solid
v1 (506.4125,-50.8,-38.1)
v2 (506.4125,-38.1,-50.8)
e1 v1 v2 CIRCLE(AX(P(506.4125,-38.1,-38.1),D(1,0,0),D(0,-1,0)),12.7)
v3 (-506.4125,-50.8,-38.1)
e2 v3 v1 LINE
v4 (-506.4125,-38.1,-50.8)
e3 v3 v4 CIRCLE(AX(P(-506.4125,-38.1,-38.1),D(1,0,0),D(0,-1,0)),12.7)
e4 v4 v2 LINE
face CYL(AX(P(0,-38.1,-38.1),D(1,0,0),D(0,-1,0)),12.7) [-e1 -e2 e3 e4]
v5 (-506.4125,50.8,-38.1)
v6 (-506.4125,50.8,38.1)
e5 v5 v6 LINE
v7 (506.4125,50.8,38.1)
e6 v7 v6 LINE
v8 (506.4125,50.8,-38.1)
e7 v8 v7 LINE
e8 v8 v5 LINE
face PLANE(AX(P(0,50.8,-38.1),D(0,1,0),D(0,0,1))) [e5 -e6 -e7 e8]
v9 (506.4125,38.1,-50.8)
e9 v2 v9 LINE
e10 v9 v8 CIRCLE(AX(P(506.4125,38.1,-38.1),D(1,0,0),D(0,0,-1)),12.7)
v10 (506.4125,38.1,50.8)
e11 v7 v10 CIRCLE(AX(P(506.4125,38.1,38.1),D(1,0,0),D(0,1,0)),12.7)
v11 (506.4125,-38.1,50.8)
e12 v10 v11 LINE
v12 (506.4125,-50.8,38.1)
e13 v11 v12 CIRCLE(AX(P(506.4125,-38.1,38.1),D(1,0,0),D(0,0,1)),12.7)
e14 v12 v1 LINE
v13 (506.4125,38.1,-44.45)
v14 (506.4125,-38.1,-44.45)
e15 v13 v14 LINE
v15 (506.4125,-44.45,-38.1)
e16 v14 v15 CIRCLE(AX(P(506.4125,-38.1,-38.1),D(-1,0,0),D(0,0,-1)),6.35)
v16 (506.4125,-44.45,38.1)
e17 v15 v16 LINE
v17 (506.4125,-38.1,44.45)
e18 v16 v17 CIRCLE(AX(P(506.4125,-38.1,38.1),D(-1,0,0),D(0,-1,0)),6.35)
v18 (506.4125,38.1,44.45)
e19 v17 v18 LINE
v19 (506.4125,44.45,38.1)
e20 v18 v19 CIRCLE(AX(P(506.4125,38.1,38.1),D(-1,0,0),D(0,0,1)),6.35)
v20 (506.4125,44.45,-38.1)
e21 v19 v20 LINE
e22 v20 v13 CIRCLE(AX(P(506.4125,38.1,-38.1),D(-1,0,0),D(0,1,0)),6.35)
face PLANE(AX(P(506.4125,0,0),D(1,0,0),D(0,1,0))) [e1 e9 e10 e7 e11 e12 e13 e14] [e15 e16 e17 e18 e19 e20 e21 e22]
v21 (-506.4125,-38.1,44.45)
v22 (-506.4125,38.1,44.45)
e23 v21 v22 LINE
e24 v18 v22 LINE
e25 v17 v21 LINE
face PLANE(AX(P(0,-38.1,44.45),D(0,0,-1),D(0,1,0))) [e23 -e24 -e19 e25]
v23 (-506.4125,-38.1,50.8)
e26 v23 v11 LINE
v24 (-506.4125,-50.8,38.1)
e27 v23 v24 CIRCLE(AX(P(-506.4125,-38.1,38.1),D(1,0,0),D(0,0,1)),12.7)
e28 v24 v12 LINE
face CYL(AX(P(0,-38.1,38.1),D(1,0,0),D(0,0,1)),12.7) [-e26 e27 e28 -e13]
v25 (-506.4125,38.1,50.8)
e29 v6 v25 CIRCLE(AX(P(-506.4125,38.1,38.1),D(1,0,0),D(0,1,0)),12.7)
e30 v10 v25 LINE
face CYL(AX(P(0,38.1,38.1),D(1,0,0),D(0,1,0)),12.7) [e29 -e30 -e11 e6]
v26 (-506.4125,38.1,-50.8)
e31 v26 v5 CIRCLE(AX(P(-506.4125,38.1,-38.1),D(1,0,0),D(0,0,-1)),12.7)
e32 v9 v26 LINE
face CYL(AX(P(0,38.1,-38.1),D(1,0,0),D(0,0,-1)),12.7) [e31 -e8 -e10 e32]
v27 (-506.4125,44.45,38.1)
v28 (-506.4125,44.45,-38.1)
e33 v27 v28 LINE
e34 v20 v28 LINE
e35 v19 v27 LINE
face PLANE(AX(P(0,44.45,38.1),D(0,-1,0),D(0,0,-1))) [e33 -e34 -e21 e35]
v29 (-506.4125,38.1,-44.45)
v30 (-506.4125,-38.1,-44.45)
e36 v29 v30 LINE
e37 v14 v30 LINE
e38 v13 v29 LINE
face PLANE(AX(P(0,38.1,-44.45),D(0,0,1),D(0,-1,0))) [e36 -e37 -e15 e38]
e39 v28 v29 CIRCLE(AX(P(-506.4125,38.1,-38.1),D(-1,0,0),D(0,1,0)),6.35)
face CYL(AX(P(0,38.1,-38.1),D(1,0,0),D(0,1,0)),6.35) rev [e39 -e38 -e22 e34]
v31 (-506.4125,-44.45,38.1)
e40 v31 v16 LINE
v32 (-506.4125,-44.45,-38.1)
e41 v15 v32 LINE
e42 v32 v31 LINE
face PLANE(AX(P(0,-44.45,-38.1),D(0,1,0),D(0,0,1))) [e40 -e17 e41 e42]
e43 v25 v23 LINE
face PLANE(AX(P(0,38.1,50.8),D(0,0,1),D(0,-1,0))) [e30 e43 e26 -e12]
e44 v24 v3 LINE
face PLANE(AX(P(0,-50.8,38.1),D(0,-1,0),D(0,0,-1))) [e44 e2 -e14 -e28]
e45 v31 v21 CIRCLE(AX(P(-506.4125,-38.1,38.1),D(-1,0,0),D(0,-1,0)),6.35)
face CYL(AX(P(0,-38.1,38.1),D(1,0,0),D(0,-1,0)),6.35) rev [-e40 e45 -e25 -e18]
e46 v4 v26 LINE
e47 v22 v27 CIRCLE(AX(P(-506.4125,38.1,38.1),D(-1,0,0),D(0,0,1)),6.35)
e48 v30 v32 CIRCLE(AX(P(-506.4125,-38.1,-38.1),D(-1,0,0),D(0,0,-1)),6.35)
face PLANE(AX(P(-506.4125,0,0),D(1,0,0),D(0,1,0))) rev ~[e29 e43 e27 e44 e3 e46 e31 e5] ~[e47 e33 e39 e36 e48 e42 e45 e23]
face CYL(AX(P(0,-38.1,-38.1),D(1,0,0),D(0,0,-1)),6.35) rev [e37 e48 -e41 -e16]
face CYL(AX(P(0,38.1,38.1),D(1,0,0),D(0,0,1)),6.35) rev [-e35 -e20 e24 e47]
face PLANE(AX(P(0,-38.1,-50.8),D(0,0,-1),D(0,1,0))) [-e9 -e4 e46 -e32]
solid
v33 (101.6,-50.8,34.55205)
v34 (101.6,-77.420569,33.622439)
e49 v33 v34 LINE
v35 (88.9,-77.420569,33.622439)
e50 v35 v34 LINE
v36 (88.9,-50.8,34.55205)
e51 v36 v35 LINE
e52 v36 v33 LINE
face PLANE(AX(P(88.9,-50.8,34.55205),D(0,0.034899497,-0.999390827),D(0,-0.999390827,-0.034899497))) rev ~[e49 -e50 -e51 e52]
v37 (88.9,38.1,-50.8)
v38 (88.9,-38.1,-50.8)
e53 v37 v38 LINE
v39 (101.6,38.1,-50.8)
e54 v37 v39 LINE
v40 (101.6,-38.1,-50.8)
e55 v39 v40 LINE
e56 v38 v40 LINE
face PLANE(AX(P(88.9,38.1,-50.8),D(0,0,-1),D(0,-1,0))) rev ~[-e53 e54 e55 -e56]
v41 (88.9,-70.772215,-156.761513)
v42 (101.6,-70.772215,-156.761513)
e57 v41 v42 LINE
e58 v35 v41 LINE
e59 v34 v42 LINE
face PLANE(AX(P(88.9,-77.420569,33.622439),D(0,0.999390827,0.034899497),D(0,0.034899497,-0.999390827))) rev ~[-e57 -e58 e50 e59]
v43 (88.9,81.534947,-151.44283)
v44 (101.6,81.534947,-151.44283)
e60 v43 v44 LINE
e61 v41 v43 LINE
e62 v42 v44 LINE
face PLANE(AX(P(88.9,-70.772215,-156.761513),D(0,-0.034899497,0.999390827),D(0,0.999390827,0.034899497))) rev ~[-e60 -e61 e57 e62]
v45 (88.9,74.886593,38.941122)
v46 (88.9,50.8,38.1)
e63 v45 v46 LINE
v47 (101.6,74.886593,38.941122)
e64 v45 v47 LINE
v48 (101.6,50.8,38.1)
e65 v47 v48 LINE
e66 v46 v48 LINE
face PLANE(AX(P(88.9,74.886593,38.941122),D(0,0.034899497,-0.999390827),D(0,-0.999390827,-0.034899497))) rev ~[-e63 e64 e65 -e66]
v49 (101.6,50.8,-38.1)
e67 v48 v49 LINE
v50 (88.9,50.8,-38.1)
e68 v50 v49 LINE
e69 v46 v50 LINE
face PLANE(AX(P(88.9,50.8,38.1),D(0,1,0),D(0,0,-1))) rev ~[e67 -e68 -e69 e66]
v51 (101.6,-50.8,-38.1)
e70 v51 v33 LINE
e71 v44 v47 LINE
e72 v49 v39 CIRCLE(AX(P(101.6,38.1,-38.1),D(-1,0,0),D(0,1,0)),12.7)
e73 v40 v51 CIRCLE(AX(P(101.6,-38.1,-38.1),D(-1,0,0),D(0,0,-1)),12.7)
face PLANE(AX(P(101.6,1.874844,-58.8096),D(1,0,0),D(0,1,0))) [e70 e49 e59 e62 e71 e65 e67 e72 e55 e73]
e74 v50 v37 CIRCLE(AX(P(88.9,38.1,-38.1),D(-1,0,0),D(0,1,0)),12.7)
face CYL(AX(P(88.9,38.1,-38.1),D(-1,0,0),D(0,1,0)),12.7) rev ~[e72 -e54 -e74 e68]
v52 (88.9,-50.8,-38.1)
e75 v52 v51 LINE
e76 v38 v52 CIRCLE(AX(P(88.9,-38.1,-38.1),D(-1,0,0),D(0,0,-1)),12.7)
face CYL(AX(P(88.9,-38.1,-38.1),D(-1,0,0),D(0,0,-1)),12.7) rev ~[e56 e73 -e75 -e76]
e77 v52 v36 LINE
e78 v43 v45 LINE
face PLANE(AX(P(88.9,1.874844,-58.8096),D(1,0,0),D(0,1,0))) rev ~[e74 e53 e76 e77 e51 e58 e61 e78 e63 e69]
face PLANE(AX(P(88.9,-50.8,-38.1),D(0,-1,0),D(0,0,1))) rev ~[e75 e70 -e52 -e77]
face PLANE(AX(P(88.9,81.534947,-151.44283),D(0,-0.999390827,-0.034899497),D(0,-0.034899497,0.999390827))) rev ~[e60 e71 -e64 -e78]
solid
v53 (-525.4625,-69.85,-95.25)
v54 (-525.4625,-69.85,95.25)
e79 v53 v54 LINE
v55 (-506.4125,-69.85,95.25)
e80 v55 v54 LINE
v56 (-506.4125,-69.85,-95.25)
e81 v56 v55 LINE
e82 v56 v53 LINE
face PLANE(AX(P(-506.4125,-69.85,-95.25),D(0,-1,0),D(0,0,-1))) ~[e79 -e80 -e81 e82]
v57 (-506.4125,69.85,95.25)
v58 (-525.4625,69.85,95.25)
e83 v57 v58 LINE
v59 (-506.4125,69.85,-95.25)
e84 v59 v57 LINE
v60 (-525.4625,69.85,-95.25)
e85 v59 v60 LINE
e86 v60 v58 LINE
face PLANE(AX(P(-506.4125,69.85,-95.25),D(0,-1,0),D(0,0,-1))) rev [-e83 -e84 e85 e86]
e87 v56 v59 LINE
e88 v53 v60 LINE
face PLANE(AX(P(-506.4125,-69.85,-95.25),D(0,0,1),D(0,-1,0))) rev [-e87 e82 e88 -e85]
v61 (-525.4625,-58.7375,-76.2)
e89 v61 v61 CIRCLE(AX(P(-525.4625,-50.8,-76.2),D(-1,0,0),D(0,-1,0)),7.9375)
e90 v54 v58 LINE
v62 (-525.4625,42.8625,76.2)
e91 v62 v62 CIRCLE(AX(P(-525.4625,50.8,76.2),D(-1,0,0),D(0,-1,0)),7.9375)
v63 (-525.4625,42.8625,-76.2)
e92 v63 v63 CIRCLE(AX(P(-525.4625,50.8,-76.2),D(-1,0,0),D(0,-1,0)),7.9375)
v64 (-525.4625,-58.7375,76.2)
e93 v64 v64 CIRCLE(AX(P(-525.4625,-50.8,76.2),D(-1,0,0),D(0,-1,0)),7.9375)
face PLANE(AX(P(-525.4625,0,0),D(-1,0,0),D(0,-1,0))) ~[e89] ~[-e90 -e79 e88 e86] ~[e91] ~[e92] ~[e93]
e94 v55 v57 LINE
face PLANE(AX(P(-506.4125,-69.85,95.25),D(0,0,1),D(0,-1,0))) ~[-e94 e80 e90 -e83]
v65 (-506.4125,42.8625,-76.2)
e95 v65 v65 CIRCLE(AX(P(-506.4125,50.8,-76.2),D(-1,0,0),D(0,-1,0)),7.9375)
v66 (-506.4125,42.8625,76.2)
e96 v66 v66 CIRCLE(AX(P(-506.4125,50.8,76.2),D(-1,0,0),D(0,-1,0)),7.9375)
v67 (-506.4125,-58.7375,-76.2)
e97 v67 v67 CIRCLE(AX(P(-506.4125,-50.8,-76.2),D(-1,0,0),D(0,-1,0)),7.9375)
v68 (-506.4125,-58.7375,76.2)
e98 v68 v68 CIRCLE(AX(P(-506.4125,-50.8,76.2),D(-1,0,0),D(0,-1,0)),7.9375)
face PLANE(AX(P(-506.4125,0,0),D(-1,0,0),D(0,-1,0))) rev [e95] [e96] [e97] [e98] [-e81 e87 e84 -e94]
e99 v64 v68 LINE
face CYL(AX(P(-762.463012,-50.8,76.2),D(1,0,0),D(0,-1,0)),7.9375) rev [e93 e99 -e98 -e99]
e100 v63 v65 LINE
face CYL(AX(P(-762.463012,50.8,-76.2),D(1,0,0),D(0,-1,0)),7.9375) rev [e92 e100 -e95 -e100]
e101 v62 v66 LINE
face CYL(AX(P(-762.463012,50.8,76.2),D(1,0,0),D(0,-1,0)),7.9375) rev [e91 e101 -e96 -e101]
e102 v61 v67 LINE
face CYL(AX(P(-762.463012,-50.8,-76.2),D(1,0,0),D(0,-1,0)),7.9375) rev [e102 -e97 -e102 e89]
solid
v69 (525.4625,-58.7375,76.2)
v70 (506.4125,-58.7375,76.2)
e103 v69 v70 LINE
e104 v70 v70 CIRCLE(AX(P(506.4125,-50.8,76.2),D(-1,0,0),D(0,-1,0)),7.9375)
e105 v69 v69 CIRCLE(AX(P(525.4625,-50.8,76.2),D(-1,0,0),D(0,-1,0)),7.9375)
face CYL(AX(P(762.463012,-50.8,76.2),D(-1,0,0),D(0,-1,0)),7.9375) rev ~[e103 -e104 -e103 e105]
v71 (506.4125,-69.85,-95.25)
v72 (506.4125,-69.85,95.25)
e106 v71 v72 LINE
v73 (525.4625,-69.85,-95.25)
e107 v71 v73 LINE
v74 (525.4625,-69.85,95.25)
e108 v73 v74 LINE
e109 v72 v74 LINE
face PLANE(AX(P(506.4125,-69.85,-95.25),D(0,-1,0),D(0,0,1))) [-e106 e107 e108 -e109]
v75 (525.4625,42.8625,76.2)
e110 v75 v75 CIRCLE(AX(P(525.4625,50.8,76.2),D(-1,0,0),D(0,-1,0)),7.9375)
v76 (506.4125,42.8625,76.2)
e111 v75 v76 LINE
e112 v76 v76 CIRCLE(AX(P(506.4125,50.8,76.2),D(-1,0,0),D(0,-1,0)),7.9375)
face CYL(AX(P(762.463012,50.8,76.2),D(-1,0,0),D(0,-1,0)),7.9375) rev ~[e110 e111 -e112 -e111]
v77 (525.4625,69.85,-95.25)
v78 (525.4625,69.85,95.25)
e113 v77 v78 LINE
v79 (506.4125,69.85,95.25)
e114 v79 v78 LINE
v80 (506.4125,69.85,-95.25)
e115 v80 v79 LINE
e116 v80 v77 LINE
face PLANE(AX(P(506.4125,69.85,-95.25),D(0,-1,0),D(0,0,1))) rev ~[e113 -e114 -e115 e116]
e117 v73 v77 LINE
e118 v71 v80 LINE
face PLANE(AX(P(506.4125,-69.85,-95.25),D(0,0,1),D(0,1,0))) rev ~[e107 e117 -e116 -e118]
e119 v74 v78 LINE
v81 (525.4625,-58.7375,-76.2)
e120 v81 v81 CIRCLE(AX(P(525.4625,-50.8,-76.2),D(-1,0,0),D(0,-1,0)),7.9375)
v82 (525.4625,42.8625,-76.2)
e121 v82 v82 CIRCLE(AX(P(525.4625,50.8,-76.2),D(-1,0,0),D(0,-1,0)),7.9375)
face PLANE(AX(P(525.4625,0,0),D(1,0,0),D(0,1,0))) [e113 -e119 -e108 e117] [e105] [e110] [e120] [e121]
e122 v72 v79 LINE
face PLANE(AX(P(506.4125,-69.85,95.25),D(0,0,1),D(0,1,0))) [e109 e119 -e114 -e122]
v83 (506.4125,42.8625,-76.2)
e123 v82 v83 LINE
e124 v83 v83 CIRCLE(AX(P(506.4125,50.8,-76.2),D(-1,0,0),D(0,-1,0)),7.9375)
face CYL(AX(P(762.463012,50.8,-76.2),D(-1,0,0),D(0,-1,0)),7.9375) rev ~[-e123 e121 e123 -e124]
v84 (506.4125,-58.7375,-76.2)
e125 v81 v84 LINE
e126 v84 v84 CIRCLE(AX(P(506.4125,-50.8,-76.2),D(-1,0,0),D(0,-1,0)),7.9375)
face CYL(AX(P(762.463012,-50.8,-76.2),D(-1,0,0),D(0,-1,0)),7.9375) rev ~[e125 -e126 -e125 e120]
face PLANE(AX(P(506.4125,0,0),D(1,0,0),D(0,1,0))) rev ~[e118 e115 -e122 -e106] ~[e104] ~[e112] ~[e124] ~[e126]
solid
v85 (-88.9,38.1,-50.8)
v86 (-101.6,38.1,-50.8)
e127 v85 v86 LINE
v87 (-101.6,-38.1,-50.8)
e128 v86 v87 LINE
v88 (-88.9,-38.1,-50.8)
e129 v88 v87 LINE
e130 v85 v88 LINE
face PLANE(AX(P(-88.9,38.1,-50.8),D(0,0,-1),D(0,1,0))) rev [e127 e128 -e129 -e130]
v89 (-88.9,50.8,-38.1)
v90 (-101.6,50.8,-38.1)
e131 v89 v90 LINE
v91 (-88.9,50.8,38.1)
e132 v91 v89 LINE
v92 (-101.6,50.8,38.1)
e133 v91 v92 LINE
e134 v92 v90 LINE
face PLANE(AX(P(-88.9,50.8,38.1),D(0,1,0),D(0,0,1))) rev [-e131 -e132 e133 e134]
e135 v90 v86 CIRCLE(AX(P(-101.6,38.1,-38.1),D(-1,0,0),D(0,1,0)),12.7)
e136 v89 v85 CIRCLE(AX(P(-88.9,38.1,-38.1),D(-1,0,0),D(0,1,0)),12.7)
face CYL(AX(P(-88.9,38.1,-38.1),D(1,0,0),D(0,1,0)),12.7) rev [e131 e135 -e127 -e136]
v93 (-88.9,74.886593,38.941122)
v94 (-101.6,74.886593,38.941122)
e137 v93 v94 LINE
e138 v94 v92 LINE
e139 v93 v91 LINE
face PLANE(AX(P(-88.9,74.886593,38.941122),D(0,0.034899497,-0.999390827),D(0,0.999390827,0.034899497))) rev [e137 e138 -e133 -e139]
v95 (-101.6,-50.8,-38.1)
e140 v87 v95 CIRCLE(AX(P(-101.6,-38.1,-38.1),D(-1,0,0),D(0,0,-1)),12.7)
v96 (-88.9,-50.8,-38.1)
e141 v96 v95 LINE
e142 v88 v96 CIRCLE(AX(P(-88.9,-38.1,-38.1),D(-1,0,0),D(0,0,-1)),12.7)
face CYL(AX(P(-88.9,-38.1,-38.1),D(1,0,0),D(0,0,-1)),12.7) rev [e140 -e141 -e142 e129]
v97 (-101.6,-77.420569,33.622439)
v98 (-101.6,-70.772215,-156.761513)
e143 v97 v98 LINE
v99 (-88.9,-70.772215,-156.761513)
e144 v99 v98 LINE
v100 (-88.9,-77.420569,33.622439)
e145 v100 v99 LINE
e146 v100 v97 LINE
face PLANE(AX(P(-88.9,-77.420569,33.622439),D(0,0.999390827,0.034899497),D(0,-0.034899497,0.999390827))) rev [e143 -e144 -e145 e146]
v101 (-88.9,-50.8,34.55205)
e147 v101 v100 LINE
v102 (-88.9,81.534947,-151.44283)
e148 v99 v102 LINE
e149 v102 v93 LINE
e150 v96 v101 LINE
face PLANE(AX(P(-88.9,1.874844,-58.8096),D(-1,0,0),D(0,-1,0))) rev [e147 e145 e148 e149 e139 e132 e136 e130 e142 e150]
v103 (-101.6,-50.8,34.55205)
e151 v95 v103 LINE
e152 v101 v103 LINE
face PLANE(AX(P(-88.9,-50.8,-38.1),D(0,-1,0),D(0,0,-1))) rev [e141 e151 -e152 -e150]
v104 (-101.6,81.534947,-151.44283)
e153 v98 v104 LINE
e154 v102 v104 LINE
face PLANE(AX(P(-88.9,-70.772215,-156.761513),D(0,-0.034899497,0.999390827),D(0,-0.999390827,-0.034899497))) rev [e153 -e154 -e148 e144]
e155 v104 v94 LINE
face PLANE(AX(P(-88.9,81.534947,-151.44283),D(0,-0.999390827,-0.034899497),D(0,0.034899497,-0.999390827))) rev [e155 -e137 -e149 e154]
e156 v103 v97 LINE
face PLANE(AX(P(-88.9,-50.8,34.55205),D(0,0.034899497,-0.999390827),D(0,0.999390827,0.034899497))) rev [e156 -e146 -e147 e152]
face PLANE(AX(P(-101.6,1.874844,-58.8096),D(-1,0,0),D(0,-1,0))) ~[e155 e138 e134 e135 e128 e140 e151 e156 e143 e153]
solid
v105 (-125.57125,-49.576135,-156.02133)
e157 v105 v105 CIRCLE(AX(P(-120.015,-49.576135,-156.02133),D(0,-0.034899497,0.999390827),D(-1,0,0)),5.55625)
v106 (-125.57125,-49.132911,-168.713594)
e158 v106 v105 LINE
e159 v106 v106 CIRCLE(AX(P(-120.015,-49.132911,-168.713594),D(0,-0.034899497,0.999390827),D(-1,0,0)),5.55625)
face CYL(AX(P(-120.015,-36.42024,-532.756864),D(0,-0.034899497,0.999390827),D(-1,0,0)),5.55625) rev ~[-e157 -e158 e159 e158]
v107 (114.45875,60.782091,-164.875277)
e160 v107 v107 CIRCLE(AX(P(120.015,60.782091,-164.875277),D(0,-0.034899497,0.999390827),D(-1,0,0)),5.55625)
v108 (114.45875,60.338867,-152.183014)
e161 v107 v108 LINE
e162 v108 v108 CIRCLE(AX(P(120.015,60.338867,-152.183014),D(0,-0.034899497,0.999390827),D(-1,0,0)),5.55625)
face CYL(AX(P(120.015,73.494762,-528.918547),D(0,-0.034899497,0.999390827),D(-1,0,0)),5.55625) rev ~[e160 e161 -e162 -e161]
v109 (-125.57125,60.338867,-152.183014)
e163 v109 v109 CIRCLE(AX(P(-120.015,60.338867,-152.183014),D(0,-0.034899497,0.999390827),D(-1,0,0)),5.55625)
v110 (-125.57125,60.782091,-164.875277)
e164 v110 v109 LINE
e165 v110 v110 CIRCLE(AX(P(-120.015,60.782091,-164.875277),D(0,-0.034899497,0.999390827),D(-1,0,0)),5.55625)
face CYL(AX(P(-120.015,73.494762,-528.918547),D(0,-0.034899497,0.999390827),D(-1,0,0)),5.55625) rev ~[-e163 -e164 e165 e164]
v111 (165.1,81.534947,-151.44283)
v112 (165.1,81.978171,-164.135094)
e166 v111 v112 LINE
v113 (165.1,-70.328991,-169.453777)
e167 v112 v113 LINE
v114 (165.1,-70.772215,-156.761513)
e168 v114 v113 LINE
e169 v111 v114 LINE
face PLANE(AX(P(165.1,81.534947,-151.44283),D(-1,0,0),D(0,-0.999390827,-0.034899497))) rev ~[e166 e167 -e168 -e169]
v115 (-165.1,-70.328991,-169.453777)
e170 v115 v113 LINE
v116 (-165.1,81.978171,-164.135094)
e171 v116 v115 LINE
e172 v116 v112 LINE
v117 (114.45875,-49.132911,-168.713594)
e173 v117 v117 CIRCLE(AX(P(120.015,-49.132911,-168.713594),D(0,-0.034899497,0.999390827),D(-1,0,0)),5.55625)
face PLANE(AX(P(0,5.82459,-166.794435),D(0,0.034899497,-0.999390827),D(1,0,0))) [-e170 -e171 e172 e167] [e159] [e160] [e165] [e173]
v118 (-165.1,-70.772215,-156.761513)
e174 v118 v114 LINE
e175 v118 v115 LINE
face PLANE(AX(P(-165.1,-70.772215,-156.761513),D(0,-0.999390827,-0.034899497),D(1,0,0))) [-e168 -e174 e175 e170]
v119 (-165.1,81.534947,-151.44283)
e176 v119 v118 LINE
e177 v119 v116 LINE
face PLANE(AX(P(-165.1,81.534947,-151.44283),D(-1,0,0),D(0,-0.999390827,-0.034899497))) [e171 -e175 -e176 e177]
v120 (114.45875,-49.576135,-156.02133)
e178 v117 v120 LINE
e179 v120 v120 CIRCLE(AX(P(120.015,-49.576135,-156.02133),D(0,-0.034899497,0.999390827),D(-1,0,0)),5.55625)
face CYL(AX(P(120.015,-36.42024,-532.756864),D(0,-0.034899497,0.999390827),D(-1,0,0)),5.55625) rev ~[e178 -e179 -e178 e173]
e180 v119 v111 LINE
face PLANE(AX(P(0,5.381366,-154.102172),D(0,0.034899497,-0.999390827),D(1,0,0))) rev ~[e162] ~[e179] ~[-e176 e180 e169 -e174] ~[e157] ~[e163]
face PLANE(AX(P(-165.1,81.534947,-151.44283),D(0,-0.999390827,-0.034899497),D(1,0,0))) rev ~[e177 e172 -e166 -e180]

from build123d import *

# Parameters (mm, degrees)
F1_DEPTH  = 506.4125
F2_W      = 139.7
F2_H      = 190.5
F3_DEPTH  = 19.05
F5_D      = 15.875
F9_DEPTH  = 12.7
F11_W     = 330.2
F11_H     = 152.4
F12_DEPTH = 12.7
F14_D     = 11.1125


# Not quite as in the source:
# - a length typed as a fraction of an inch, garbled in the dataset ("3 / 203.2 mm" for 3/8 in), is restored


with BuildPart() as f1:
    # F0 (on Right) → F1 (new body, symmetric)
    with BuildSketch(Plane.YZ):
        with BuildLine():
            Line((38.1, 50.8), (-38.1, 50.8))
            ThreePointArc((-38.1, 50.8), (-47.0802561211, 47.0802561211), (-50.8, 38.1))
            Line((-50.8, 38.1), (-50.8, -38.1))
            ThreePointArc((-50.8, -38.1), (-47.0802561211, -47.0802561211), (-38.1, -50.8))
            Line((-38.1, -50.8), (38.1, -50.8))
            ThreePointArc((38.1, -50.8), (47.0802561211, -47.0802561211), (50.8, -38.1))
            Line((50.8, -38.1), (50.8, 38.1))
            ThreePointArc((50.8, 38.1), (47.0802561211, 47.0802561211), (38.1, 50.8))
        make_face()
        with BuildLine():
            ThreePointArc((-44.45, 38.1), (-42.5901280605, 42.5901280605), (-38.1, 44.45))
            Line((-38.1, 44.45), (38.1, 44.45))
            ThreePointArc((38.1, 44.45), (42.5901280605, 42.5901280605), (44.45, 38.1))
            Line((44.45, 38.1), (44.45, -38.1))
            ThreePointArc((44.45, -38.1), (42.5901280605, -42.5901280605), (38.1, -44.45))
            Line((38.1, -44.45), (-38.1, -44.45))
            ThreePointArc((-38.1, -44.45), (-42.5901280605, -42.5901280605), (-44.45, -38.1))
            Line((-44.45, -38.1), (-44.45, 38.1))
        make_face(mode=Mode.SUBTRACT)
    extrude(amount=F1_DEPTH, both=True)


with BuildPart() as f3:
    # F2 (on face) → F3 (new body)
    with BuildSketch(Plane.YZ.offset(506.4125)):
        Rectangle(F2_W, F2_H)
    extrude(amount=F3_DEPTH)

    # F5 (through all)
    with Locations(Plane.YZ.offset(525.4625)):
        with Locations((-50.8, 76.2), (50.8, 76.2), (-50.8, -76.2), (50.8, -76.2)):
            Hole(F5_D / 2)


with BuildPart() as f6_1:
    # F6: instance of F3
    add(f3.part.mirror(Plane.YZ))


with BuildPart() as f9:
    # F8 (on offset) → F9 (new body)
    with BuildSketch(Plane.YZ.offset(88.9)):
        with BuildLine():
            Line((81.5349474393, -151.4428301741), (74.8865933174, 38.9411223731))
            Line((74.8865933174, 38.9411223731), (50.8, 38.1))
            Line((50.8, 38.1), (50.8, -38.1))
            ThreePointArc((50.8, -38.1), (47.0802561211, -47.0802561211), (38.1, -50.8))
            Line((38.1, -50.8), (-38.1, -50.8))
            ThreePointArc((-38.1, -50.8), (-47.0802561211, -47.0802561211), (-50.8, -38.1))
            Line((-50.8, -38.1), (-50.8, 34.5520498196))
            Line((-50.8, 34.5520498196), (-77.4205687203, 33.6224390756))
            Line((-77.4205687203, 33.6224390756), (-70.7722145985, -156.7615134715))
            Line((-70.7722145985, -156.7615134715), (81.5349474393, -151.4428301741))
        make_face()
    extrude(amount=F9_DEPTH)


with BuildPart() as f10_1:
    # F10: instance of F9
    add(f9.part.mirror(Plane.YZ))


with BuildPart() as f12:
    # F11 (on face) → F12 (new body)
    with BuildSketch(Plane(origin=(0, 5.3813664204, -154.1021718228), x_dir=(1, 0, 0), z_dir=(0, 0.0348994967, -0.999390827))):
        Rectangle(F11_W, F11_H)
    extrude(amount=F12_DEPTH)

    # F14 (through all)
    with Locations(Plane(origin=(0, 5.8245900285, -166.7944353259), x_dir=(1, 0, 0), z_dir=(0, 0.0348994967, -0.999390827))):
        with Locations((-120.015, 54.991), (120.015, 54.991), (120.015, -54.991), (-120.015, -54.991)):
            Hole(F14_D / 2)


solid = Compound([f1.part, f3.part, f6_1.part, f9.part, f10_1.part, f12.part])
